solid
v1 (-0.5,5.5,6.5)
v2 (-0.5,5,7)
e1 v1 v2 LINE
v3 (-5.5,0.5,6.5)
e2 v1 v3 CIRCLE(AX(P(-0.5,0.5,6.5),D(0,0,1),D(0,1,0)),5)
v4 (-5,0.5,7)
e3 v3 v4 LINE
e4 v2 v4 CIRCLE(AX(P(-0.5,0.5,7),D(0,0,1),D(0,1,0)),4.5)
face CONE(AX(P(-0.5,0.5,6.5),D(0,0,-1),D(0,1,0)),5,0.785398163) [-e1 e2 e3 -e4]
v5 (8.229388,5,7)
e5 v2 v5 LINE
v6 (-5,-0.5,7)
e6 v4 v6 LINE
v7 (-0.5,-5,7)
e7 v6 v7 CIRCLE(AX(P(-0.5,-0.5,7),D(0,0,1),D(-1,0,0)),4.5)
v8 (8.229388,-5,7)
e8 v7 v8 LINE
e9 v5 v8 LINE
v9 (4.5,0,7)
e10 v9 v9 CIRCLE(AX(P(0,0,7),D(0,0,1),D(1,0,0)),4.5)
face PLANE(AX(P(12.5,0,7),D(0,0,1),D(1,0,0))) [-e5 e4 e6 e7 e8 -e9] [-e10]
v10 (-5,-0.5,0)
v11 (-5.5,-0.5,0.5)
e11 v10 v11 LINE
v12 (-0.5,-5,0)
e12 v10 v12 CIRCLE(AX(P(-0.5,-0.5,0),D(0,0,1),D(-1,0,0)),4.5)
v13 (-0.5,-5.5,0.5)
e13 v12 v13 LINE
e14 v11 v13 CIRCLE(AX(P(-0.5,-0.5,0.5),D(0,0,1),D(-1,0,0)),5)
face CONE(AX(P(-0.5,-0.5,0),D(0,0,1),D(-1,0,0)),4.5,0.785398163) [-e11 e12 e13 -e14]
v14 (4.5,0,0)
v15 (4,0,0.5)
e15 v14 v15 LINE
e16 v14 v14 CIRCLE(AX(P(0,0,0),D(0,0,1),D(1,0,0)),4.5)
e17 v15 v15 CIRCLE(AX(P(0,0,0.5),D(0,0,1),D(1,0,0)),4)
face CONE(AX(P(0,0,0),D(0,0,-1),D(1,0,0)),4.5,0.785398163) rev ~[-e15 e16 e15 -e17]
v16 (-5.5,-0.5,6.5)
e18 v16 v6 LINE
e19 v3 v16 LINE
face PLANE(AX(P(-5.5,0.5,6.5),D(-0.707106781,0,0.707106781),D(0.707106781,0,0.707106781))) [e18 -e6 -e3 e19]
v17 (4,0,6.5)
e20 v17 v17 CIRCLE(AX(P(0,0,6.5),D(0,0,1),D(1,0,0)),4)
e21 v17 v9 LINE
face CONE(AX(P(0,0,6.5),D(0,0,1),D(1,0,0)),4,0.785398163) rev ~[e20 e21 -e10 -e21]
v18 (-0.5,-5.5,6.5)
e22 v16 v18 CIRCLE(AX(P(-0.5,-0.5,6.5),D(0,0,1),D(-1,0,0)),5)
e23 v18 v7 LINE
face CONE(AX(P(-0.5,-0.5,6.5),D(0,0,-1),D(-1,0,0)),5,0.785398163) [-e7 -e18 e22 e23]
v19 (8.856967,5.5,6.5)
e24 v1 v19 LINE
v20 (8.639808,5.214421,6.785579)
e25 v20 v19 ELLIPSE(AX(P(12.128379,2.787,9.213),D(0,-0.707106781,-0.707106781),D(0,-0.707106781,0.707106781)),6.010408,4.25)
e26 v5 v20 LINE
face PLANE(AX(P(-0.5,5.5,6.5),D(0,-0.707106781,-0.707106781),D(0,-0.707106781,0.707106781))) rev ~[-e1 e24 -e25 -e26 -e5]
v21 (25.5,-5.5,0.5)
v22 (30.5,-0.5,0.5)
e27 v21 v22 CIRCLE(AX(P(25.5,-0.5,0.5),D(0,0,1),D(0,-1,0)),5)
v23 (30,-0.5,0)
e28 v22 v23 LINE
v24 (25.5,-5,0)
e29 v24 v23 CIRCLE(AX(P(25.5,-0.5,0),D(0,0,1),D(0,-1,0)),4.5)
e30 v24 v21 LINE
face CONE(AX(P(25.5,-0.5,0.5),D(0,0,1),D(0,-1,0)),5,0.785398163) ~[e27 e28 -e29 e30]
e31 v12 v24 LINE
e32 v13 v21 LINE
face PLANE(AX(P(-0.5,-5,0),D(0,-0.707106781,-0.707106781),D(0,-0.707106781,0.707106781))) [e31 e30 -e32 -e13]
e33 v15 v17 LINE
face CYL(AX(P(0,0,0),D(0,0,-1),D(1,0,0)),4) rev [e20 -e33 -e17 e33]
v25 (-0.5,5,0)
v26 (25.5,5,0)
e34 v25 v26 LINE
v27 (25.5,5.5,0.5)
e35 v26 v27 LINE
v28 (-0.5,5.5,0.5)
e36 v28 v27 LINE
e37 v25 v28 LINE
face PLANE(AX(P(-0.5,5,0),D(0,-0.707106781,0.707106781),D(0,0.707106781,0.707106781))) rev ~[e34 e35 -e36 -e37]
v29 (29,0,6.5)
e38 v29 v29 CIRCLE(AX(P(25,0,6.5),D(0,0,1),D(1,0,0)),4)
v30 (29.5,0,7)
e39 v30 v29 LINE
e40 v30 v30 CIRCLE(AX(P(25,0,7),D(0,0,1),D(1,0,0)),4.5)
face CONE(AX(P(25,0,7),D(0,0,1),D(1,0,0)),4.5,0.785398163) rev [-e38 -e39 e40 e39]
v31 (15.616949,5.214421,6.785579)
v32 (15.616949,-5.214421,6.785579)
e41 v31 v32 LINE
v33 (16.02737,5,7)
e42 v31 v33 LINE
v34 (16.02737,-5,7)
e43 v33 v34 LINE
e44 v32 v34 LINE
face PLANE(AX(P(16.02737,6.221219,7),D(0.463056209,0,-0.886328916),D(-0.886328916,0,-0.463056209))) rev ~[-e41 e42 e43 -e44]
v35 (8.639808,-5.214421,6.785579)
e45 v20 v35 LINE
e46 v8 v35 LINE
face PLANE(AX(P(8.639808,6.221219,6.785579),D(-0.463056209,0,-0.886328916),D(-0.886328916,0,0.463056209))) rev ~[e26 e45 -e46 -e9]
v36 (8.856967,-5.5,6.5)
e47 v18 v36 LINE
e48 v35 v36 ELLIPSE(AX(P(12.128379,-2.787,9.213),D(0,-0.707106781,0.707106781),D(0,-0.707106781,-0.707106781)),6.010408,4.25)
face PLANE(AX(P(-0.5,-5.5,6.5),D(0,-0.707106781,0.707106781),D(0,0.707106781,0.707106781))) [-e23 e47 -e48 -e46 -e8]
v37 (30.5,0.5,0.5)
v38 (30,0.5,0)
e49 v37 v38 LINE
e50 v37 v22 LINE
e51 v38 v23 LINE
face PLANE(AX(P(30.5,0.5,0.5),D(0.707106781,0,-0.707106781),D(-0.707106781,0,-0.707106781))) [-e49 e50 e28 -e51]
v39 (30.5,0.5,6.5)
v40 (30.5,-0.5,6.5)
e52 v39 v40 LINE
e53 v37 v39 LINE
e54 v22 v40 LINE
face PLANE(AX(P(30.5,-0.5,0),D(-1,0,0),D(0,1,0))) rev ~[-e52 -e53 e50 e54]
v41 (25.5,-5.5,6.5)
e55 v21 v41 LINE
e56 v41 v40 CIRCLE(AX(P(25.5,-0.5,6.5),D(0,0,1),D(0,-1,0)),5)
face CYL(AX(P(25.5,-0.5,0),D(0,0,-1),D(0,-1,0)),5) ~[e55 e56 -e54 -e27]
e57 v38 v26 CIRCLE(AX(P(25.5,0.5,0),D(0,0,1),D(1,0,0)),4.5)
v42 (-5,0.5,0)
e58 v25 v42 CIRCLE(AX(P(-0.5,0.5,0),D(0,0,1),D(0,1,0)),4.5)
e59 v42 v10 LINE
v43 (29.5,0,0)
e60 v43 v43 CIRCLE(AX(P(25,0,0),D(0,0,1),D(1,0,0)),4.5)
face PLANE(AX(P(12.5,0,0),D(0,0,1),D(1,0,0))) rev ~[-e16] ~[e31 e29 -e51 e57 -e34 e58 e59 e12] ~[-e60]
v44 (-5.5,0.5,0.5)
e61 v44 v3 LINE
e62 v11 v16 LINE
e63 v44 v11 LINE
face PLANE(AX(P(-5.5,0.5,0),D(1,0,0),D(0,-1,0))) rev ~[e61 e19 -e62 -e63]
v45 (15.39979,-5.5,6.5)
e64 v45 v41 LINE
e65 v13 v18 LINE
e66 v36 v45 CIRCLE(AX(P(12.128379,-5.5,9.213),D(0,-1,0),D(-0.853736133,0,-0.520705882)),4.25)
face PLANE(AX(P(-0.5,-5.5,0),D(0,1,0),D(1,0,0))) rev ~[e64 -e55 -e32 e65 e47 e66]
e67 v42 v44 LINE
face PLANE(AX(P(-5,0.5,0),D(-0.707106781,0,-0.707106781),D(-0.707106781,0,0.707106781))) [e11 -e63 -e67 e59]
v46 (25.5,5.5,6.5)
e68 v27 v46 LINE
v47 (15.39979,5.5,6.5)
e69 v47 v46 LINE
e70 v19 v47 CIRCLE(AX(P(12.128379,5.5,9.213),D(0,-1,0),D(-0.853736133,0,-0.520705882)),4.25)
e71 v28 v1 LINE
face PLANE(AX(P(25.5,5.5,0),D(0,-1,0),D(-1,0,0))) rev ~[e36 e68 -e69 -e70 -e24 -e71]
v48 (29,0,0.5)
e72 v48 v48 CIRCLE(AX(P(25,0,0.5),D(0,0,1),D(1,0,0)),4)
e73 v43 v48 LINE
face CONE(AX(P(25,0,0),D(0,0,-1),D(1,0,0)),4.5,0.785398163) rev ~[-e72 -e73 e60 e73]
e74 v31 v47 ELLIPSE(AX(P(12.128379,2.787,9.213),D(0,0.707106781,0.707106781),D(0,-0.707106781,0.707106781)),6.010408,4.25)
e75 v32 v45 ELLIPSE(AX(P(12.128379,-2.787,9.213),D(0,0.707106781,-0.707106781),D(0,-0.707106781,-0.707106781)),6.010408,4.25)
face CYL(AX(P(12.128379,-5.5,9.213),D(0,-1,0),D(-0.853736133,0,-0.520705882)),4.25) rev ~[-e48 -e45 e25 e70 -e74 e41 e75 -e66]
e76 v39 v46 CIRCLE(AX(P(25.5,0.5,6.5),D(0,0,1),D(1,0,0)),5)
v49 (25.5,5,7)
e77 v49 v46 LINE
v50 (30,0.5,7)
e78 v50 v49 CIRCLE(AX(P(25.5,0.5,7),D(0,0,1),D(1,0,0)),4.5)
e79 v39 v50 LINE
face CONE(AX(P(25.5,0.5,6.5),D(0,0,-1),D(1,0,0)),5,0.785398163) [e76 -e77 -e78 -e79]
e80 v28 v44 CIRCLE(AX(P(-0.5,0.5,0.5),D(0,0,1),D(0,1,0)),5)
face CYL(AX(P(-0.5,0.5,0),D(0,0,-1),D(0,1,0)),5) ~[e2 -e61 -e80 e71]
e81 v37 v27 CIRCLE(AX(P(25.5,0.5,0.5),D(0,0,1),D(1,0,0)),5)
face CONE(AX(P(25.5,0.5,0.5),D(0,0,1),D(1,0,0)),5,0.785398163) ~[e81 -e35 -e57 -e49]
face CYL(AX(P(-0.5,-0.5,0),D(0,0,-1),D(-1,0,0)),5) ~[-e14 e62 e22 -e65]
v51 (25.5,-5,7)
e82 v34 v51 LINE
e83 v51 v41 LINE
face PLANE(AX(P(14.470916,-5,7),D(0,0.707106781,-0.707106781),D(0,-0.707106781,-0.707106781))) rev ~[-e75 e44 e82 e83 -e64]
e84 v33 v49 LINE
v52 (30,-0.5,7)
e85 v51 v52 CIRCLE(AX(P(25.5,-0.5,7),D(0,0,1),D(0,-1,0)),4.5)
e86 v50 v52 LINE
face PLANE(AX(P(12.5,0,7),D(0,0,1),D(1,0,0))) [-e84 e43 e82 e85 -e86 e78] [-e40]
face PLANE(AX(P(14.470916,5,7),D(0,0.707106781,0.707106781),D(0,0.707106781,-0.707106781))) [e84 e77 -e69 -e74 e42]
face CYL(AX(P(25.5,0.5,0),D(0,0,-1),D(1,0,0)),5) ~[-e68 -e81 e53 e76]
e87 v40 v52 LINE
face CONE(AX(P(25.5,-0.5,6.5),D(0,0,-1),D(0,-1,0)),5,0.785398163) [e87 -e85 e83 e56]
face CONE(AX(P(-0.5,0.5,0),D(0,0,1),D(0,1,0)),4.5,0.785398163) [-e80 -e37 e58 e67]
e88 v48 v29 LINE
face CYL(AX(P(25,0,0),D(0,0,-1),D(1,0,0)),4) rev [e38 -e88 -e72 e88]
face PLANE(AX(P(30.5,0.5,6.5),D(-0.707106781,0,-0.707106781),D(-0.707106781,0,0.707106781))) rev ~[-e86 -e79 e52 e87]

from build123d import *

# Parameters (mm, degrees)
F0_R         = 4
F1_DEPTH     = 7
F3_DEPTH     = 25
F4_T1_DEPTH  = 26
F4_T3_DEPTH  = 1
F4_T5_DEPTH  = 10.285841494
F4_T7_DEPTH  = 12.4424386412
F4_T9_DEPTH  = 11.029084367
F4_T12_ANGLE = 90
F4_T14_ANGLE = 90
F4_T16_ANGLE = 90
F4_T18_ANGLE = 90
F4_T24_ANGLE = 90
F4_T26_ANGLE = 90
F4_T30_ANGLE = 90
F4_T32_ANGLE = 90


# Not quite as in the source:
# - a fillet or chamfer that OpenCascade refuses, or shapes differently, is made with other operations: its cross-section is extruded or revolved along the edge and cut away or added


with BuildPart() as f1:
    # F0 (on Top) → F1 (new body)
    with BuildSketch(Plane.XY):
        with BuildLine():
            Line((25.5, 5.5), (-0.5, 5.5))
            ThreePointArc((-0.5, 5.5), (-4.0355339059, 4.0355339059), (-5.5, 0.5))
            Line((-5.5, 0.5), (-5.5, -0.5))
            ThreePointArc((-5.5, -0.5), (-4.0355339059, -4.0355339059), (-0.5, -5.5))
            Line((-0.5, -5.5), (25.5, -5.5))
            ThreePointArc((25.5, -5.5), (29.0355339059, -4.0355339059), (30.5, -0.5))
            Line((30.5, -0.5), (30.5, 0.5))
            ThreePointArc((30.5, 0.5), (29.0355339059, 4.0355339059), (25.5, 5.5))
        make_face()
        Circle(F0_R, mode=Mode.SUBTRACT)
        with Locations((25, 0)):
            Circle(F0_R, mode=Mode.SUBTRACT)
    extrude(amount=F1_DEPTH)

    # F2 (on face) → F3 (cut)
    with BuildSketch(Plane.XZ.offset(5.5)):
        with BuildLine():
            Line((15.756757127, 7), (8.5, 7))
            ThreePointArc((8.5, 7), (12.1283785635, 4.963), (15.756757127, 7))
        make_face()
    extrude(amount=-F3_DEPTH, mode=Mode.SUBTRACT)

    # F4: chamfer of 0.5 on 24 edges, made by hand

    # F4_s2 → F4_t1 (cut)
    with BuildSketch(Plane.YZ.offset(-0.5)):
        Polygon((-5, 0), (-5.5, 0.5), (-5.5, 0), align=None)
        Polygon((5, 0), (5.5, 0.5), (5.5, 0), align=None)
    extrude(amount=F4_T1_DEPTH, mode=Mode.SUBTRACT)

    # F4_s4 → F4_t3 (cut)
    with BuildSketch(Plane.XZ.offset(-0.5)):
        Polygon((30.5, 0.5), (30, 0), (30.5, 0), align=None)
        Polygon((-5, 0), (-5.5, 0.5), (-5.5, 0), align=None)
        Polygon((-5.5, 6.5), (-5, 7), (-5.5, 7), align=None)
        Polygon((30.5, 6.5), (30, 7), (30.5, 7), align=None)
    extrude(amount=F4_T3_DEPTH, mode=Mode.SUBTRACT)

    # F4_s6 → F4_t5 (cut)
    with BuildSketch(Plane.YZ.offset(-0.5)):
        Polygon((-5.5, 6.5), (-5, 7), (-5.5, 7), align=None)
        Polygon((5.5, 6.5), (5, 7), (5.5, 7), align=None)
    extrude(amount=F4_T5_DEPTH, mode=Mode.SUBTRACT)

    # F4_s8 → F4_t7 (cut)
    with BuildSketch(Plane.XZ.offset(-6.2212193206)):
        with BuildLine():
            Line((8.6398076479, 6.7855789474), (8.2293875402, 7))
            Line((8.2293875402, 7), (8.5, 7))
            ThreePointArc((8.5, 7), (8.5730669131, 6.8844255286), (8.6398076479, 6.7855789474))
        make_face()
        with BuildLine():
            Line((16.0273695868, 7), (15.6169494791, 6.7855789474))
            ThreePointArc((15.6169494791, 6.7855789474), (15.6836902138, 6.8844255286), (15.756757127, 7))
            Line((15.756757127, 7), (16.0273695868, 7))
        make_face()
    extrude(amount=F4_T7_DEPTH, mode=Mode.SUBTRACT)

    # F4_s10 → F4_t9 (cut)
    with BuildSketch(Plane.YZ.offset(14.470915633)):
        Polygon((-5, 7), (-5.5, 6.5), (-5.5, 7), align=None)
        Polygon((5, 7), (5.5, 6.5), (5.5, 7), align=None)
    extrude(amount=F4_T9_DEPTH, mode=Mode.SUBTRACT)

    # F4_s11 → F4_t12 (revolve, cut)
    with BuildSketch(Plane.XZ.offset(-0.5)):
        Polygon((30.5, 0.5), (30, 0), (30.5, 0), align=None)
    revolve(axis=Axis((25.5, 0.5, 0), (0, 0, 1)), revolution_arc=F4_T12_ANGLE, mode=Mode.SUBTRACT)

    # F4_s13 → F4_t14 (revolve, cut)
    with BuildSketch(Plane.YZ.offset(-0.5)):
        Polygon((5, 0), (5.5, 0.5), (5.5, 0), align=None)
    revolve(axis=Axis((-0.5, 0.5, 0), (0, 0, 1)), revolution_arc=F4_T14_ANGLE, mode=Mode.SUBTRACT)

    # F4_s15 → F4_t16 (revolve, cut)
    with BuildSketch(Plane.XZ.offset(0.5)):
        Polygon((-5, 0), (-5.5, 0.5), (-5.5, 0), align=None)
    revolve(axis=Axis((-0.5, -0.5, 0), (0, 0, 1)), revolution_arc=F4_T16_ANGLE, mode=Mode.SUBTRACT)

    # F4_s17 → F4_t18 (revolve, cut)
    with BuildSketch(Plane.YZ.offset(25.5)):
        Polygon((-5.5, 0.5), (-5, 0), (-5.5, 0), align=None)
    revolve(axis=Axis((25.5, -0.5, 0), (0, 0, 1)), revolution_arc=F4_T18_ANGLE, mode=Mode.SUBTRACT)

    # F4_s19 → F4_t20 (revolve, cut)
    with BuildSketch(Plane.XZ):
        Polygon((4.5, 0), (4, 0.5), (4, 0), align=None)
    revolve(axis=Axis((0, 0, 0), (0, 0, 1)), mode=Mode.SUBTRACT)

    # F4_s21 → F4_t22 (revolve, cut)
    with BuildSketch(Plane.XZ):
        Polygon((29.5, 0), (29, 0.5), (29, 0), align=None)
    revolve(axis=Axis((25, 0, 0), (0, 0, 1)), mode=Mode.SUBTRACT)

    # F4_s23 → F4_t24 (revolve, cut)
    with BuildSketch(Plane.XZ.offset(0.5)):
        Polygon((-5.5, 6.5), (-5, 7), (-5.5, 7), align=None)
    revolve(axis=Axis((-0.5, -0.5, 7), (0, 0, 1)), revolution_arc=F4_T24_ANGLE, mode=Mode.SUBTRACT)

    # F4_s25 → F4_t26 (revolve, cut)
    with BuildSketch(Plane.YZ.offset(-0.5)):
        Polygon((5.5, 6.5), (5, 7), (5.5, 7), align=None)
    revolve(axis=Axis((-0.5, 0.5, 7), (0, 0, 1)), revolution_arc=F4_T26_ANGLE, mode=Mode.SUBTRACT)

    # F4_s27 → F4_t28 (revolve, cut)
    with BuildSketch(Plane.XZ):
        Polygon((4, 6.5), (4.5, 7), (4, 7), align=None)
    revolve(axis=Axis((0, 0, 7), (0, 0, 1)), mode=Mode.SUBTRACT)

    # F4_s29 → F4_t30 (revolve, cut)
    with BuildSketch(Plane.YZ.offset(25.5)):
        Polygon((-5.5, 6.5), (-5, 7), (-5.5, 7), align=None)
    revolve(axis=Axis((25.5, -0.5, 7), (0, 0, 1)), revolution_arc=F4_T30_ANGLE, mode=Mode.SUBTRACT)

    # F4_s31 → F4_t32 (revolve, cut)
    with BuildSketch(Plane.XZ.offset(-0.5)):
        Polygon((30.5, 6.5), (30, 7), (30.5, 7), align=None)
    revolve(axis=Axis((25.5, 0.5, 7), (0, 0, 1)), revolution_arc=F4_T32_ANGLE, mode=Mode.SUBTRACT)

    # F4_s33 → F4_t34 (revolve, cut)
    with BuildSketch(Plane.XZ):
        Polygon((29.5, 7), (29, 6.5), (29, 7), align=None)
    revolve(axis=Axis((25, 0, 7), (0, 0, 1)), mode=Mode.SUBTRACT)


solid = f1.part
